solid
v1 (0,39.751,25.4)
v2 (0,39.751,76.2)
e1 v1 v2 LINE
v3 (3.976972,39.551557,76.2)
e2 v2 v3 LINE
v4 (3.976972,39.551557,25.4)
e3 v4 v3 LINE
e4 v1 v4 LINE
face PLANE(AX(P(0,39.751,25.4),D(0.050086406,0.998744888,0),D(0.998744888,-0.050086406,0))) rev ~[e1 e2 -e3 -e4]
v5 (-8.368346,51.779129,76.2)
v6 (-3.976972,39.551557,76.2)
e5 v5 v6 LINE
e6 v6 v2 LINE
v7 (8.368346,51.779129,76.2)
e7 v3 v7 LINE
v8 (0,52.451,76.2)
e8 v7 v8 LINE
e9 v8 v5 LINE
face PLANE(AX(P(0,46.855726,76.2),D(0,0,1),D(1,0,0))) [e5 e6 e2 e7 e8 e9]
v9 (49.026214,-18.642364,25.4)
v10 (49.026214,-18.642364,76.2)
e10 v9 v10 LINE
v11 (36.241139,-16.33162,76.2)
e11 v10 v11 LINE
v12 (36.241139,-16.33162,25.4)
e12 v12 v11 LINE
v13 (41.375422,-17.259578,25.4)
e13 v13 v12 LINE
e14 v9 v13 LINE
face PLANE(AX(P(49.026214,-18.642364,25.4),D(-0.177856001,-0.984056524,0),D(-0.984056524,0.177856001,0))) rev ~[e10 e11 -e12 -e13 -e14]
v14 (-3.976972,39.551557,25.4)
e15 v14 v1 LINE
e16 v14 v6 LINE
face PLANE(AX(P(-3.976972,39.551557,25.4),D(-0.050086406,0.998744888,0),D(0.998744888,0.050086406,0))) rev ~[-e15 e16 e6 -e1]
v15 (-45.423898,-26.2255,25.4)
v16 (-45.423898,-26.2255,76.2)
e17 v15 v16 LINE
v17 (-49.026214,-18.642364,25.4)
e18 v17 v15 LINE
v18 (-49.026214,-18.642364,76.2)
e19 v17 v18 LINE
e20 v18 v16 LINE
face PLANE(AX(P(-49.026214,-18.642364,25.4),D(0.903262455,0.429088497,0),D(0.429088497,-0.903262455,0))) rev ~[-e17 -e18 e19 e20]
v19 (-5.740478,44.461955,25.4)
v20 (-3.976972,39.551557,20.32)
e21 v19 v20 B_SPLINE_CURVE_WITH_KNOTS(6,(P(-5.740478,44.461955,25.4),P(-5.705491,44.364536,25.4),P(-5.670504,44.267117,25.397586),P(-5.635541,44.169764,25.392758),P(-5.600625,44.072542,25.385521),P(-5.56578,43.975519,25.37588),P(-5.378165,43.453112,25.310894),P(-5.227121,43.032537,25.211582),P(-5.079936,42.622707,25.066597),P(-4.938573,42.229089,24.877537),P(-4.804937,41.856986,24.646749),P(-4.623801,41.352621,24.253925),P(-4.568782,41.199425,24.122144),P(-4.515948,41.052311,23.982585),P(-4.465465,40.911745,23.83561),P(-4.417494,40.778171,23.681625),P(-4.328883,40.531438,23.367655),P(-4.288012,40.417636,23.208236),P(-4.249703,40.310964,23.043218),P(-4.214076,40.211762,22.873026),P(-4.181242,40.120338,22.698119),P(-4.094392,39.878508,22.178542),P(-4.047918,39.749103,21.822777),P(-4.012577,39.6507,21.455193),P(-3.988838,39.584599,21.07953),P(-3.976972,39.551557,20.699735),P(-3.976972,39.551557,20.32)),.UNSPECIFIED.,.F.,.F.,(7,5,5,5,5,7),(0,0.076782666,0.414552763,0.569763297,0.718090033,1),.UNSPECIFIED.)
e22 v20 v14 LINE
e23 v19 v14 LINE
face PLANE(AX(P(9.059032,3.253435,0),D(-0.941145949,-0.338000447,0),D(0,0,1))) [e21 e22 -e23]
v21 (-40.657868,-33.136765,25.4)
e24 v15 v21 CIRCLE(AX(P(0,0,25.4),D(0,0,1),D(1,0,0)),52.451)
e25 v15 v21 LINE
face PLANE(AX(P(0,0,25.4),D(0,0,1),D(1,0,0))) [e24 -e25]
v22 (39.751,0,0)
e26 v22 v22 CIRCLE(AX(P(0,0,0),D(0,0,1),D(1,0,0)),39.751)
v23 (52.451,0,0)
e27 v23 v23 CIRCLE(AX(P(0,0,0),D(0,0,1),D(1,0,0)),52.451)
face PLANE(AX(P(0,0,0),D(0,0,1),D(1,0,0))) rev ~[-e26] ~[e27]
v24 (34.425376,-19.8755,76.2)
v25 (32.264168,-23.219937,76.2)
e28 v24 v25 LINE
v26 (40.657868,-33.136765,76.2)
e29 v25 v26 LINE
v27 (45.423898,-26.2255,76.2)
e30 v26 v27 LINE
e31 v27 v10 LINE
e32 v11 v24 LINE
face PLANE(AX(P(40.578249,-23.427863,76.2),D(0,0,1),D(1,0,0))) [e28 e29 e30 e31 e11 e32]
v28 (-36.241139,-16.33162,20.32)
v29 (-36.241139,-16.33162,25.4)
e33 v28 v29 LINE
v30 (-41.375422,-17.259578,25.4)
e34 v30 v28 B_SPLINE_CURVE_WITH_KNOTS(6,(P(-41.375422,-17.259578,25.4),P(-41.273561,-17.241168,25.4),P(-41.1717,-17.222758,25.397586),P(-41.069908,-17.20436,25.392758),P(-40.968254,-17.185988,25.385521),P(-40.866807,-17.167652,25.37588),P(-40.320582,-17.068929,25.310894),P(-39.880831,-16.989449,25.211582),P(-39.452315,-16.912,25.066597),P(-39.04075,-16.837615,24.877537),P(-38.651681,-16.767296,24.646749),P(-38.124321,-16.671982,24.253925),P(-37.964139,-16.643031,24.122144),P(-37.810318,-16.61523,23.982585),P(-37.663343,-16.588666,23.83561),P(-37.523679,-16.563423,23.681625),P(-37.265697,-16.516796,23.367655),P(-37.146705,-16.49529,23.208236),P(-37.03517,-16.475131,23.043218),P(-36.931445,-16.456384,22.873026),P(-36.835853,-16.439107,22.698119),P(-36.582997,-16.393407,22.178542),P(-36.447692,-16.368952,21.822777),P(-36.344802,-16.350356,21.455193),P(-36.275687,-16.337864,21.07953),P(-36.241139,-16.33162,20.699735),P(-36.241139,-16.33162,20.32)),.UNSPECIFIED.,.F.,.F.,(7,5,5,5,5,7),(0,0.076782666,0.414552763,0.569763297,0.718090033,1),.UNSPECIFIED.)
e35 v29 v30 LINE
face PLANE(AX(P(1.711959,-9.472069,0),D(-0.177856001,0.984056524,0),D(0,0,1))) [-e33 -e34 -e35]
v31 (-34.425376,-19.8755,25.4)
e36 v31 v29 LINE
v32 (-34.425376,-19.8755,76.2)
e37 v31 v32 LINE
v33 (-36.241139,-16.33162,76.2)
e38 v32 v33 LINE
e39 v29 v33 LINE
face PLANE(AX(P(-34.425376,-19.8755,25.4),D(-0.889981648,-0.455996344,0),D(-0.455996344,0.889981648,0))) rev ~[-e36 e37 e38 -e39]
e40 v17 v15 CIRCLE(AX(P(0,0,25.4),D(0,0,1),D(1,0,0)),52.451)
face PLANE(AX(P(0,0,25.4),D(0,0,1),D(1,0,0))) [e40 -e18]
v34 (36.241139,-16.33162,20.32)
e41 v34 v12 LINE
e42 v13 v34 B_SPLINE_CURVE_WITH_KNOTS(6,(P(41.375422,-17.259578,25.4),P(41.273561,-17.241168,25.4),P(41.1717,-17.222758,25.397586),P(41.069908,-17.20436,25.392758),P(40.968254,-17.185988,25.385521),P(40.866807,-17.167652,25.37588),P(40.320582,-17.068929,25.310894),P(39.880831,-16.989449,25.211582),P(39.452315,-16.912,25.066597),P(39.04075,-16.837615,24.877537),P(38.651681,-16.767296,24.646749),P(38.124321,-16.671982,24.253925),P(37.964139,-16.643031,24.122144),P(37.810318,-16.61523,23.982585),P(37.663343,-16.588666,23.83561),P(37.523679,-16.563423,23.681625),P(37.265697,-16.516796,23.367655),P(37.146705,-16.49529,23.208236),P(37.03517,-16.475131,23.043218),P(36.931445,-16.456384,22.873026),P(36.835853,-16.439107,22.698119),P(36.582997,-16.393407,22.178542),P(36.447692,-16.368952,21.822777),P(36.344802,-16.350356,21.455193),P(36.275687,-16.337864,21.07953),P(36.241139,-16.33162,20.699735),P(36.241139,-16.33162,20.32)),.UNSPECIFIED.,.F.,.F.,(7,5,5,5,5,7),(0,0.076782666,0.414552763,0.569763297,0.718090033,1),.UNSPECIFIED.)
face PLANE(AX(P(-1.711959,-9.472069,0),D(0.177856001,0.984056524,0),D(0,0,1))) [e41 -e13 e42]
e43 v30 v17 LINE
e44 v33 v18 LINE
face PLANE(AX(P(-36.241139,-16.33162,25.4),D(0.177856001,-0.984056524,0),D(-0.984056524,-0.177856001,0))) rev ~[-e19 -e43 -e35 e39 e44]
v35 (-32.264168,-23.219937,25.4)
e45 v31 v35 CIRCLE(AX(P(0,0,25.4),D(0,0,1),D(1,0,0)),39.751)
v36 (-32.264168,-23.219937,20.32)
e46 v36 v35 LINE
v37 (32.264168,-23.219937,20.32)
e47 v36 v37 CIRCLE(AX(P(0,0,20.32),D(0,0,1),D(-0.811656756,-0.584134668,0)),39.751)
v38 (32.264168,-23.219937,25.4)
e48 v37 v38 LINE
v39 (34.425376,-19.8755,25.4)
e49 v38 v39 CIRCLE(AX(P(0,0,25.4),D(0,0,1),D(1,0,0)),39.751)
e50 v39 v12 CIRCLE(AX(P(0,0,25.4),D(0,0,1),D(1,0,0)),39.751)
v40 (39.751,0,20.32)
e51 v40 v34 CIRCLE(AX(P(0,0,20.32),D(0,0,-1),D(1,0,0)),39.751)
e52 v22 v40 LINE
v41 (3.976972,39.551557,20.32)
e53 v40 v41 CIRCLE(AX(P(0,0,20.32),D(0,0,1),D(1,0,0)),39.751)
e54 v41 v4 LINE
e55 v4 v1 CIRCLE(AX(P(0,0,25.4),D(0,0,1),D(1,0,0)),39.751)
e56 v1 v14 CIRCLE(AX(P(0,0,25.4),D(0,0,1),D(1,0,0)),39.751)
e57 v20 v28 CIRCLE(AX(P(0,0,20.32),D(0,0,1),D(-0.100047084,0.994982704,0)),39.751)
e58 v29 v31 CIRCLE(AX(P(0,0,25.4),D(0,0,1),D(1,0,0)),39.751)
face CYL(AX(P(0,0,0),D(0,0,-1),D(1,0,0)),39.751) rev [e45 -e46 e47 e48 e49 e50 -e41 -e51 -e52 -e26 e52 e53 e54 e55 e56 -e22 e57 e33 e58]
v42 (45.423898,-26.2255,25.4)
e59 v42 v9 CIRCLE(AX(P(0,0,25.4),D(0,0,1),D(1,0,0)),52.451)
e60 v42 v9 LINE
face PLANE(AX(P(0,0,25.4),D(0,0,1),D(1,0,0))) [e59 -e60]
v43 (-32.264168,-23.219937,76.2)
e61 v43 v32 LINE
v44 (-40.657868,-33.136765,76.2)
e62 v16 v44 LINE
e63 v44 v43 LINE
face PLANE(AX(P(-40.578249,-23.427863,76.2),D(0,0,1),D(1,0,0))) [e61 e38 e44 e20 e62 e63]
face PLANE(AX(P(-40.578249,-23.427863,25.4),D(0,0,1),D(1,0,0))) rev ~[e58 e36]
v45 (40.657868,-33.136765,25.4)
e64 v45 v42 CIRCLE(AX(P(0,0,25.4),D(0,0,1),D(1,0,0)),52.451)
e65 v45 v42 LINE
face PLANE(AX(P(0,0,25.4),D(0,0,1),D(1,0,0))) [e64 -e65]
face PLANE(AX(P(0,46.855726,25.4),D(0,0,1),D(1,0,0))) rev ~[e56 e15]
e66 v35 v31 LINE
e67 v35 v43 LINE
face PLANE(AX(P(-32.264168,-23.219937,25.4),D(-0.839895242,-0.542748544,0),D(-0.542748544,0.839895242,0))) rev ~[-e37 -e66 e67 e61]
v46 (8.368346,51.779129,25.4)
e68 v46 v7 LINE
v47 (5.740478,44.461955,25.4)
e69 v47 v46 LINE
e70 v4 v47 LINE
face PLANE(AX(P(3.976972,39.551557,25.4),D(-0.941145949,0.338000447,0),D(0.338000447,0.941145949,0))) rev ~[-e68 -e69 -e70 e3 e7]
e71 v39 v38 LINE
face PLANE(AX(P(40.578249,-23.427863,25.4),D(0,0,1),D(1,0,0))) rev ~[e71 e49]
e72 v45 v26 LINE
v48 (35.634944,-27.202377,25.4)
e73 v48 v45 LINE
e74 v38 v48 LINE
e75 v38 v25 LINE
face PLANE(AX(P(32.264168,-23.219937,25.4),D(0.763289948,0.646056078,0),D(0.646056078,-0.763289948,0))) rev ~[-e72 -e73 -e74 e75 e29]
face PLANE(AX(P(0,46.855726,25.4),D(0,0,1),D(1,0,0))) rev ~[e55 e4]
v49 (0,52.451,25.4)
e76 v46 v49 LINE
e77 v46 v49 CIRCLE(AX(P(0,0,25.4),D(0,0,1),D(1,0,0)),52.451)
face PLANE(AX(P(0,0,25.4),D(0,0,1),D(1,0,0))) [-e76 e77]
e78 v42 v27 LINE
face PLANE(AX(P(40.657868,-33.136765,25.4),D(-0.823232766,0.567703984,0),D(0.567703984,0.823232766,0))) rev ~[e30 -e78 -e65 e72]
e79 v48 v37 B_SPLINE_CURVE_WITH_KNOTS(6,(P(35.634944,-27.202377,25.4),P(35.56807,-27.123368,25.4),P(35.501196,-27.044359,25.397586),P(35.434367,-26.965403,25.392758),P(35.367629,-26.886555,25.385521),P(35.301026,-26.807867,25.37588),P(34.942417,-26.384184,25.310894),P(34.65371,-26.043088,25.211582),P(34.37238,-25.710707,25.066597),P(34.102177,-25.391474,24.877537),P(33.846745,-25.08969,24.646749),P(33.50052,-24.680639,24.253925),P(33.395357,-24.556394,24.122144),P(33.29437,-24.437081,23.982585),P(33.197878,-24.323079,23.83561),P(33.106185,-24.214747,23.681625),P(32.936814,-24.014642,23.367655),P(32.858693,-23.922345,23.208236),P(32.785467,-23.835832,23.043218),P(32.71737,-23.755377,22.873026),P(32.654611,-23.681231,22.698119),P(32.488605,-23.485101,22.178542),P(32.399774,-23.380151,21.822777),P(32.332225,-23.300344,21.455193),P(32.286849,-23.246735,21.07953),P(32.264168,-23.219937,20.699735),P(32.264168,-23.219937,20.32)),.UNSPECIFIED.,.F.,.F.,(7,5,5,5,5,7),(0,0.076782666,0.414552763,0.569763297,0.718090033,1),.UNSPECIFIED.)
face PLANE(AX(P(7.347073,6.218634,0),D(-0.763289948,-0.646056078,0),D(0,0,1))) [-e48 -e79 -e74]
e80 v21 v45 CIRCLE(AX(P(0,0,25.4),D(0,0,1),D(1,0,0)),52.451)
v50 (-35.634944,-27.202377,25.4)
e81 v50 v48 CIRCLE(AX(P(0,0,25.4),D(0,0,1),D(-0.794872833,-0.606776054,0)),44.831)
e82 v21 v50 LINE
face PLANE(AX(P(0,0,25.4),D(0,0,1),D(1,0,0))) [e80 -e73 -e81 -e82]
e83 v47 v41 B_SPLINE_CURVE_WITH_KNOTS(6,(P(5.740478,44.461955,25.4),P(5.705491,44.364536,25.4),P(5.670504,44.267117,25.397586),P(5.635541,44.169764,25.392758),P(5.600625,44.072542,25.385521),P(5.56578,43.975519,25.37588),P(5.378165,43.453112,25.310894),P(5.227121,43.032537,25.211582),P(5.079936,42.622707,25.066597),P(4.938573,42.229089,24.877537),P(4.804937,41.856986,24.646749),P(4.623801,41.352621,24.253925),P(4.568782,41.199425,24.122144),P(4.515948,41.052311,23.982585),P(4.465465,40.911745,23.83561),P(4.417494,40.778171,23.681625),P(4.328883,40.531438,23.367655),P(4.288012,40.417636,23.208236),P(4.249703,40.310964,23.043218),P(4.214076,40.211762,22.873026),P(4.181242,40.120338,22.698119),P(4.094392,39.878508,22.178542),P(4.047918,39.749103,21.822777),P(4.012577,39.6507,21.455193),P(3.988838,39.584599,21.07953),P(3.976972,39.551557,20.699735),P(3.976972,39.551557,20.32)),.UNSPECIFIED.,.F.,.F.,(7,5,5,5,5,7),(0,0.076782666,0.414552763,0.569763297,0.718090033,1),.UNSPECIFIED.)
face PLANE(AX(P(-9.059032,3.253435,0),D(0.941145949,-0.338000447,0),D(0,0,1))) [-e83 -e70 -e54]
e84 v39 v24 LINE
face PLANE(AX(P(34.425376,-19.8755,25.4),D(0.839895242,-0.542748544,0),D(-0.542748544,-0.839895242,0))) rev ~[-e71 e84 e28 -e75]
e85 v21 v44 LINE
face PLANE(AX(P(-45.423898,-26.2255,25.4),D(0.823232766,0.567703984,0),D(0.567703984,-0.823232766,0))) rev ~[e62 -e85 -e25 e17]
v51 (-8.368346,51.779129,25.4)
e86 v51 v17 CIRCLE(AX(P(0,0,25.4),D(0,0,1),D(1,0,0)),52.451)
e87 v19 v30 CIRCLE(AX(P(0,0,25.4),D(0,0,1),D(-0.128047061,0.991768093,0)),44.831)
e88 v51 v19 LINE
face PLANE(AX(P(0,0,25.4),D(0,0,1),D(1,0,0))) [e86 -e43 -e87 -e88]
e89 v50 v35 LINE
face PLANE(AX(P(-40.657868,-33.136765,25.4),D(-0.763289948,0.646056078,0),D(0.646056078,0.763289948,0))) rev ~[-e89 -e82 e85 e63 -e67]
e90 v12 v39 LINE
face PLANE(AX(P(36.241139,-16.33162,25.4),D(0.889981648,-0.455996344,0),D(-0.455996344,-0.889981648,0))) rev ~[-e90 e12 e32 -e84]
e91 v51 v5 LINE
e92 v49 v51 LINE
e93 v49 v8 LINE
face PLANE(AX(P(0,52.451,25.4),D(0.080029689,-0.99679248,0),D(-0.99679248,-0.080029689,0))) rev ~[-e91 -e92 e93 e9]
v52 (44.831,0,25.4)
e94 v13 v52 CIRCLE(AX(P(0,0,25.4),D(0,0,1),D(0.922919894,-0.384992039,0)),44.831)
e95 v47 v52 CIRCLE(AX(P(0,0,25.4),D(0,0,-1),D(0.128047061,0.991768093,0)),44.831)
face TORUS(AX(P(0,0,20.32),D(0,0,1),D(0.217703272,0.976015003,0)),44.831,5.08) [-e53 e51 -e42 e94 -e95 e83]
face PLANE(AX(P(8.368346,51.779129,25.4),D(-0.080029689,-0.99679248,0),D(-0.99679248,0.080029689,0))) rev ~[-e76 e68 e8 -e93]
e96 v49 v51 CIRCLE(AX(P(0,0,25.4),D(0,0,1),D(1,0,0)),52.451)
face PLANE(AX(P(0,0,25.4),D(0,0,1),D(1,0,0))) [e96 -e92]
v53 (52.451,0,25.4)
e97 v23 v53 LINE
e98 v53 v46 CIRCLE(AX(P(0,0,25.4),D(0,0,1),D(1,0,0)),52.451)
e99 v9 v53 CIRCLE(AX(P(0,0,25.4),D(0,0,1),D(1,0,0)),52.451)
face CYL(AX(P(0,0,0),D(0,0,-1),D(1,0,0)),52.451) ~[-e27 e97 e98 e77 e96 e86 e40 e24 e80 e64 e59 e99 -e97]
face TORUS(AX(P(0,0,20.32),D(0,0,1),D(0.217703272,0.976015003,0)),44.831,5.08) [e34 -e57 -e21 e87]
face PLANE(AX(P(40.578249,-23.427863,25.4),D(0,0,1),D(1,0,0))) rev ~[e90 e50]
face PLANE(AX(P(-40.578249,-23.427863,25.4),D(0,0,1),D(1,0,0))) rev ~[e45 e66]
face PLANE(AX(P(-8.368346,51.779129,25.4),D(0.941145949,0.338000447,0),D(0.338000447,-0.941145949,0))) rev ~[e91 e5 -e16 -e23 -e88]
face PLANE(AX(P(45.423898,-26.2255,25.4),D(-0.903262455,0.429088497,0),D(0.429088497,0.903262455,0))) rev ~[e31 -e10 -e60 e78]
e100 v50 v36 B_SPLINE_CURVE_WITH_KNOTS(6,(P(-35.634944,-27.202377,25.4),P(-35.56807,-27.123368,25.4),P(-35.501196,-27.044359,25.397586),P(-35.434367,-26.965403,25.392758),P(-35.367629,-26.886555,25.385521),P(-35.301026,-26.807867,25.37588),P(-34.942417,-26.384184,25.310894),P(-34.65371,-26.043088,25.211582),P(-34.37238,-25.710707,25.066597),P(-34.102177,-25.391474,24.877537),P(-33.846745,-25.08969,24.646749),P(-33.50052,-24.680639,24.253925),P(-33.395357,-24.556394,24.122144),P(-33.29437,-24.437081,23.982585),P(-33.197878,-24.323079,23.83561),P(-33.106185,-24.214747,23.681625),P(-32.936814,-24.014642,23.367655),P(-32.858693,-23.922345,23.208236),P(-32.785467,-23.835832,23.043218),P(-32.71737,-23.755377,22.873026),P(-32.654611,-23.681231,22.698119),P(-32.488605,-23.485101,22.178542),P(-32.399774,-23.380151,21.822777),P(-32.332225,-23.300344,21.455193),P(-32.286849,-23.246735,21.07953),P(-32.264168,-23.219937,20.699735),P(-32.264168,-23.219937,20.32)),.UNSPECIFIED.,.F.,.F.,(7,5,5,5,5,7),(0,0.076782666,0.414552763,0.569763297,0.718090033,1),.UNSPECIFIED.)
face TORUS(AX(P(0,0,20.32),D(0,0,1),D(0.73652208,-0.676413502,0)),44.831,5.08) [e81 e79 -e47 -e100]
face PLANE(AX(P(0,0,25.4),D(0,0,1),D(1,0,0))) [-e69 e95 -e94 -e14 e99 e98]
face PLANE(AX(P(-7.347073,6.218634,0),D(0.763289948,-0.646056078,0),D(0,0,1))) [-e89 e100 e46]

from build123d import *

# Parameters (mm, degrees)
F0_R         = 52.451
F0_R_2       = 39.751
F1_DEPTH     = 25.4
F3_DEPTH     = 50.8
F4_T4_ANGLE  = 145.1483416982
F4_T9_ANGLE  = 145.1483416982
F4_T16_ANGLE = 145.1483416982
F4_T23_ANGLE = 145.1483416982
F4_T28_ANGLE = 42.5640131775
F4_T33_ANGLE = 42.5640131775
F4_T38_ANGLE = 102.5699239424
F4_T44_ANGLE = 102.5699239424
F4_T49_ANGLE = 102.5699239424
F4_T54_ANGLE = 145.1483416982
F4_T59_ANGLE = 145.1483416982
F4_T66_ANGLE = 145.1483416982
F4_T73_ANGLE = 145.1483416982


# Not quite as in the source:
# - a fillet or chamfer that OpenCascade refuses, or shapes differently, is made with other operations: its cross-section is extruded or revolved along the edge and cut away or added


with BuildPart() as f1:
    # F0 (on Top) → F1 (new body)
    with BuildSketch(Plane.XY):
        Circle(F0_R)
        Circle(F0_R_2, mode=Mode.SUBTRACT)
    extrude(amount=F1_DEPTH)

    # F2 (on face) → F3 (join)
    with BuildSketch(Plane.XY.offset(25.4)):
        Polygon((0, 39.751), (3.9769716214, 39.5515574627), (8.3683463891, 51.7791288041), (0, 52.451), (-8.3683463891, 51.7791288041), (-3.9769716214, 39.5515574627), align=None)
        Polygon((-49.0262141247, -18.6423638414), (-45.4238984539, -26.2255), (-40.6578677356, -33.1367649627), (-32.2641677112, -23.2199371856), (-34.4253758258, -19.8755), (-36.2411393326, -16.331620277), align=None)
        Polygon((40.6578677356, -33.1367649627), (45.4238984539, -26.2255), (49.0262141247, -18.6423638414), (36.2411393326, -16.331620277), (34.4253758258, -19.8755), (32.2641677112, -23.2199371856), align=None)
    extrude(amount=F3_DEPTH)

    # F4: fillet of radius 5.08 on 4 edges, made by hand


with BuildPart() as f4_tool2:
    # F4_s3 → F4_t4 (revolve)
    with BuildSketch(Plane(origin=(0, 0, 0), x_dir=(0, 0, 1), z_dir=(0.9760150026, -0.2177032723, 0))):
        with BuildLine():
            ThreePointArc((25.4, -44.831), (23.9121024484, -41.2388975516), (20.32, -39.751))
            Line((20.32, -39.751), (25.4, -39.751))
            Line((25.4, -39.751), (25.4, -44.831))
        make_face()
    revolve(axis=Axis((0, 0, 25.4), (0, 0, 1)), revolution_arc=F4_T4_ANGLE)

    split(bisect_by=Plane(origin=(-9.0590317285, 3.2534345735, 0), x_dir=(0, 0, 1), z_dir=(0.9411459494, -0.3380004466, 0)), keep=Keep.TOP)


with BuildPart() as f1_1:
    add(f1.part)

    # F4_t1: cut F4_tool2
    add(f4_tool2.part, mode=Mode.SUBTRACT)


with BuildPart() as f4_tool7:
    # F4_s8 → F4_t9 (revolve)
    with BuildSketch(Plane(origin=(0, 0, 0), x_dir=(0, 0, 1), z_dir=(0.9760150026, -0.2177032723, 0))):
        with BuildLine():
            ThreePointArc((25.4, -44.831), (23.9121024484, -41.2388975516), (20.32, -39.751))
            Line((20.32, -39.751), (25.4, -39.751))
            Line((25.4, -39.751), (25.4, -44.831))
        make_face()
    revolve(axis=Axis((0, 0, 25.4), (0, 0, 1)), revolution_arc=F4_T9_ANGLE)

    split(bisect_by=Plane(origin=(9.0590317285, 3.2534345735, 0), x_dir=(0, 0, 1), z_dir=(-0.9411459494, -0.3380004466, 0)), keep=Keep.TOP)

    split(bisect_by=Plane(origin=(-33.3447717685, -21.5477185928, 0), x_dir=(0, 0, 1), z_dir=(0.8398952423, 0.542748544, 0)), keep=Keep.TOP)

    split(bisect_by=Plane(origin=(-35.3332575792, -18.1035601385, 0), x_dir=(0, 0, 1), z_dir=(0.8899816481, 0.4559963443, 0)), keep=Keep.TOP)


with BuildPart() as f1_2:
    add(f1_1.part)

    # F4_t6: cut F4_tool7
    add(f4_tool7.part, mode=Mode.SUBTRACT)


with BuildPart() as f4_tool14:
    # F4_s15 → F4_t16 (revolve)
    with BuildSketch(Plane(origin=(0, 0, 0), x_dir=(0, 0, 1), z_dir=(0.9760150026, -0.2177032723, 0))):
        with BuildLine():
            ThreePointArc((25.4, -44.831), (23.9121024484, -41.2388975516), (20.32, -39.751))
            Line((20.32, -39.751), (25.4, -39.751))
            Line((25.4, -39.751), (25.4, -44.831))
        make_face()
    revolve(axis=Axis((0, 0, 25.4), (0, 0, 1)), revolution_arc=F4_T16_ANGLE)

    split(bisect_by=Plane(origin=(1.7119588741, -9.4720688973, 0), x_dir=(0, 0, 1), z_dir=(-0.1778560014, 0.9840565242, 0)), keep=Keep.TOP)

    split(bisect_by=Plane(origin=(1.9884858107, 39.6512787313, 0), x_dir=(0, 0, 1), z_dir=(-0.0500864058, -0.9987448883, 0)), keep=Keep.TOP)

    split(bisect_by=Plane(origin=(-1.9884858107, 39.6512787313, 0), x_dir=(0, 0, 1), z_dir=(0.0500864058, -0.9987448883, 0)), keep=Keep.TOP)


with BuildPart() as f1_3:
    add(f1_2.part)

    # F4_t13: cut F4_tool14
    add(f4_tool14.part, mode=Mode.SUBTRACT)


with BuildPart() as f4_tool21:
    # F4_s22 → F4_t23 (revolve)
    with BuildSketch(Plane(origin=(0, 0, 0), x_dir=(0, 0, 1), z_dir=(0.9760150026, -0.2177032723, 0))):
        with BuildLine():
            ThreePointArc((25.4, -44.831), (23.9121024484, -41.2388975516), (20.32, -39.751))
            Line((20.32, -39.751), (25.4, -39.751))
            Line((25.4, -39.751), (25.4, -44.831))
        make_face()
    revolve(axis=Axis((0, 0, 25.4), (0, 0, 1)), revolution_arc=F4_T23_ANGLE)

    split(bisect_by=Plane(origin=(-7.3470728544, 6.2186343238, 0), x_dir=(0, 0, 1), z_dir=(0.763289948, -0.6460560775, 0)), keep=Keep.TOP)


with BuildPart() as f1_4:
    add(f1_3.part)

    # F4_t20: cut F4_tool21
    add(f4_tool21.part, mode=Mode.SUBTRACT)


with BuildPart() as f4_tool26:
    # F4_s27 → F4_t28 (revolve)
    with BuildSketch(Plane(origin=(0, 0, 0), x_dir=(0, 0, 1), z_dir=(-0.6764135021, -0.7365220799, 0))):
        with BuildLine():
            ThreePointArc((25.4, -44.831), (23.9121024484, -41.2388975516), (20.32, -39.751))
            Line((20.32, -39.751), (25.4, -39.751))
            Line((25.4, -39.751), (25.4, -44.831))
        make_face()
    revolve(axis=Axis((0, 0, 25.4), (0, 0, 1)), revolution_arc=F4_T28_ANGLE)

    split(bisect_by=Plane(origin=(7.3470728544, 6.2186343238, 0), x_dir=(0, 0, 1), z_dir=(-0.763289948, -0.6460560775, 0)), keep=Keep.TOP)


with BuildPart() as f1_5:
    add(f1_4.part)

    # F4_t25: cut F4_tool26
    add(f4_tool26.part, mode=Mode.SUBTRACT)


with BuildPart() as f4_tool31:
    # F4_s32 → F4_t33 (revolve)
    with BuildSketch(Plane(origin=(0, 0, 0), x_dir=(0, 0, 1), z_dir=(-0.6764135021, -0.7365220799, 0))):
        with BuildLine():
            ThreePointArc((25.4, -44.831), (23.9121024484, -41.2388975516), (20.32, -39.751))
            Line((20.32, -39.751), (25.4, -39.751))
            Line((25.4, -39.751), (25.4, -44.831))
        make_face()
    revolve(axis=Axis((0, 0, 25.4), (0, 0, 1)), revolution_arc=F4_T33_ANGLE)

    split(bisect_by=Plane(origin=(-1.7119588741, -9.4720688973, 0), x_dir=(0, 0, 1), z_dir=(0.1778560014, 0.9840565242, 0)), keep=Keep.TOP)


with BuildPart() as f1_6:
    add(f1_5.part)

    # F4_t30: cut F4_tool31
    add(f4_tool31.part, mode=Mode.SUBTRACT)


with BuildPart() as f4_tool36:
    # F4_s37 → F4_t38 (revolve)
    with BuildSketch(Plane.XZ):
        with BuildLine():
            ThreePointArc((44.831, 25.4), (41.2388975516, 23.9121024484), (39.751, 20.32))
            Line((39.751, 20.32), (39.751, 25.4))
            Line((39.751, 25.4), (44.831, 25.4))
        make_face()
    revolve(axis=Axis((0, 0, 25.4), (0, 0, 1)), revolution_arc=F4_T38_ANGLE)

    split(bisect_by=Plane(origin=(1.9884858107, 39.6512787313, 0), x_dir=(0, 0, 1), z_dir=(-0.0500864058, -0.9987448883, 0)), keep=Keep.TOP)

    split(bisect_by=Plane(origin=(-1.9884858107, 39.6512787313, 0), x_dir=(0, 0, 1), z_dir=(0.0500864058, -0.9987448883, 0)), keep=Keep.TOP)


with BuildPart() as f1_7:
    add(f1_6.part)

    # F4_t35: cut F4_tool36
    add(f4_tool36.part, mode=Mode.SUBTRACT)


with BuildPart() as f4_tool42:
    # F4_s43 → F4_t44 (revolve)
    with BuildSketch(Plane.XZ):
        with BuildLine():
            ThreePointArc((44.831, 25.4), (41.2388975516, 23.9121024484), (39.751, 20.32))
            Line((39.751, 20.32), (39.751, 25.4))
            Line((39.751, 25.4), (44.831, 25.4))
        make_face()
    revolve(axis=Axis((0, 0, 25.4), (0, 0, 1)), revolution_arc=F4_T44_ANGLE)

    split(bisect_by=Plane(origin=(-9.0590317285, 3.2534345735, 0), x_dir=(0, 0, 1), z_dir=(0.9411459494, -0.3380004466, 0)), keep=Keep.TOP)


with BuildPart() as f1_8:
    add(f1_7.part)

    # F4_t41: cut F4_tool42
    add(f4_tool42.part, mode=Mode.SUBTRACT)


with BuildPart() as f4_tool47:
    # F4_s48 → F4_t49 (revolve)
    with BuildSketch(Plane.XZ):
        with BuildLine():
            ThreePointArc((44.831, 25.4), (41.2388975516, 23.9121024484), (39.751, 20.32))
            Line((39.751, 20.32), (39.751, 25.4))
            Line((39.751, 25.4), (44.831, 25.4))
        make_face()
    revolve(axis=Axis((0, 0, 25.4), (0, 0, 1)), revolution_arc=F4_T49_ANGLE)

    split(bisect_by=Plane(origin=(9.0590317285, 3.2534345735, 0), x_dir=(0, 0, 1), z_dir=(-0.9411459494, -0.3380004466, 0)), keep=Keep.TOP)


with BuildPart() as f1_9:
    add(f1_8.part)

    # F4_t46: cut F4_tool47
    add(f4_tool47.part, mode=Mode.SUBTRACT)


with BuildPart() as f4_tool52:
    # F4_s53 → F4_t54 (revolve)
    with BuildSketch(Plane(origin=(0, 0, 0), x_dir=(0, 0, 1), z_dir=(-0.299470937, 0.9541054229, 0))):
        with BuildLine():
            ThreePointArc((25.4, -44.831), (23.9121024484, -41.2388975516), (20.32, -39.751))
            Line((20.32, -39.751), (25.4, -39.751))
            Line((25.4, -39.751), (25.4, -44.831))
        make_face()
    revolve(axis=Axis((0, 0, 25.4), (0, 0, 1)), revolution_arc=F4_T54_ANGLE)

    split(bisect_by=Plane(origin=(1.7119588741, -9.4720688973, 0), x_dir=(0, 0, 1), z_dir=(-0.1778560014, 0.9840565242, 0)), keep=Keep.TOP)


with BuildPart() as f1_10:
    add(f1_9.part)

    # F4_t51: cut F4_tool52
    add(f4_tool52.part, mode=Mode.SUBTRACT)


with BuildPart() as f4_tool57:
    # F4_s58 → F4_t59 (revolve)
    with BuildSketch(Plane(origin=(0, 0, 0), x_dir=(0, 0, 1), z_dir=(-0.299470937, 0.9541054229, 0))):
        with BuildLine():
            ThreePointArc((25.4, -44.831), (23.9121024484, -41.2388975516), (20.32, -39.751))
            Line((20.32, -39.751), (25.4, -39.751))
            Line((25.4, -39.751), (25.4, -44.831))
        make_face()
    revolve(axis=Axis((0, 0, 25.4), (0, 0, 1)), revolution_arc=F4_T59_ANGLE)

    split(bisect_by=Plane(origin=(-7.3470728544, 6.2186343238, 0), x_dir=(0, 0, 1), z_dir=(0.763289948, -0.6460560775, 0)), keep=Keep.TOP)

    split(bisect_by=Plane(origin=(35.3332575792, -18.1035601385, 0), x_dir=(0, 0, 1), z_dir=(-0.8899816481, 0.4559963443, 0)), keep=Keep.TOP)

    split(bisect_by=Plane(origin=(33.3447717685, -21.5477185928, 0), x_dir=(0, 0, 1), z_dir=(-0.8398952423, 0.542748544, 0)), keep=Keep.TOP)


with BuildPart() as f1_11:
    add(f1_10.part)

    # F4_t56: cut F4_tool57
    add(f4_tool57.part, mode=Mode.SUBTRACT)


with BuildPart() as f4_tool64:
    # F4_s65 → F4_t66 (revolve)
    with BuildSketch(Plane(origin=(0, 0, 0), x_dir=(0, 0, 1), z_dir=(-0.299470937, 0.9541054229, 0))):
        with BuildLine():
            ThreePointArc((25.4, -44.831), (23.9121024484, -41.2388975516), (20.32, -39.751))
            Line((20.32, -39.751), (25.4, -39.751))
            Line((25.4, -39.751), (25.4, -44.831))
        make_face()
    revolve(axis=Axis((0, 0, 25.4), (0, 0, 1)), revolution_arc=F4_T66_ANGLE)

    split(bisect_by=Plane(origin=(7.3470728544, 6.2186343238, 0), x_dir=(0, 0, 1), z_dir=(-0.763289948, -0.6460560775, 0)), keep=Keep.TOP)

    split(bisect_by=Plane(origin=(-33.3447717685, -21.5477185928, 0), x_dir=(0, 0, 1), z_dir=(0.8398952423, 0.542748544, 0)), keep=Keep.TOP)

    split(bisect_by=Plane(origin=(-35.3332575792, -18.1035601385, 0), x_dir=(0, 0, 1), z_dir=(0.8899816481, 0.4559963443, 0)), keep=Keep.TOP)


with BuildPart() as f1_12:
    add(f1_11.part)

    # F4_t63: cut F4_tool64
    add(f4_tool64.part, mode=Mode.SUBTRACT)


with BuildPart() as f4_tool71:
    # F4_s72 → F4_t73 (revolve)
    with BuildSketch(Plane(origin=(0, 0, 0), x_dir=(0, 0, 1), z_dir=(-0.299470937, 0.9541054229, 0))):
        with BuildLine():
            ThreePointArc((25.4, -44.831), (23.9121024484, -41.2388975516), (20.32, -39.751))
            Line((20.32, -39.751), (25.4, -39.751))
            Line((25.4, -39.751), (25.4, -44.831))
        make_face()
    revolve(axis=Axis((0, 0, 25.4), (0, 0, 1)), revolution_arc=F4_T73_ANGLE)

    split(bisect_by=Plane(origin=(-1.7119588741, -9.4720688973, 0), x_dir=(0, 0, 1), z_dir=(0.1778560014, 0.9840565242, 0)), keep=Keep.TOP)


with BuildPart() as f1_13:
    add(f1_12.part)

    # F4_t70: cut F4_tool71
    add(f4_tool71.part, mode=Mode.SUBTRACT)


solid = f1_13.part
